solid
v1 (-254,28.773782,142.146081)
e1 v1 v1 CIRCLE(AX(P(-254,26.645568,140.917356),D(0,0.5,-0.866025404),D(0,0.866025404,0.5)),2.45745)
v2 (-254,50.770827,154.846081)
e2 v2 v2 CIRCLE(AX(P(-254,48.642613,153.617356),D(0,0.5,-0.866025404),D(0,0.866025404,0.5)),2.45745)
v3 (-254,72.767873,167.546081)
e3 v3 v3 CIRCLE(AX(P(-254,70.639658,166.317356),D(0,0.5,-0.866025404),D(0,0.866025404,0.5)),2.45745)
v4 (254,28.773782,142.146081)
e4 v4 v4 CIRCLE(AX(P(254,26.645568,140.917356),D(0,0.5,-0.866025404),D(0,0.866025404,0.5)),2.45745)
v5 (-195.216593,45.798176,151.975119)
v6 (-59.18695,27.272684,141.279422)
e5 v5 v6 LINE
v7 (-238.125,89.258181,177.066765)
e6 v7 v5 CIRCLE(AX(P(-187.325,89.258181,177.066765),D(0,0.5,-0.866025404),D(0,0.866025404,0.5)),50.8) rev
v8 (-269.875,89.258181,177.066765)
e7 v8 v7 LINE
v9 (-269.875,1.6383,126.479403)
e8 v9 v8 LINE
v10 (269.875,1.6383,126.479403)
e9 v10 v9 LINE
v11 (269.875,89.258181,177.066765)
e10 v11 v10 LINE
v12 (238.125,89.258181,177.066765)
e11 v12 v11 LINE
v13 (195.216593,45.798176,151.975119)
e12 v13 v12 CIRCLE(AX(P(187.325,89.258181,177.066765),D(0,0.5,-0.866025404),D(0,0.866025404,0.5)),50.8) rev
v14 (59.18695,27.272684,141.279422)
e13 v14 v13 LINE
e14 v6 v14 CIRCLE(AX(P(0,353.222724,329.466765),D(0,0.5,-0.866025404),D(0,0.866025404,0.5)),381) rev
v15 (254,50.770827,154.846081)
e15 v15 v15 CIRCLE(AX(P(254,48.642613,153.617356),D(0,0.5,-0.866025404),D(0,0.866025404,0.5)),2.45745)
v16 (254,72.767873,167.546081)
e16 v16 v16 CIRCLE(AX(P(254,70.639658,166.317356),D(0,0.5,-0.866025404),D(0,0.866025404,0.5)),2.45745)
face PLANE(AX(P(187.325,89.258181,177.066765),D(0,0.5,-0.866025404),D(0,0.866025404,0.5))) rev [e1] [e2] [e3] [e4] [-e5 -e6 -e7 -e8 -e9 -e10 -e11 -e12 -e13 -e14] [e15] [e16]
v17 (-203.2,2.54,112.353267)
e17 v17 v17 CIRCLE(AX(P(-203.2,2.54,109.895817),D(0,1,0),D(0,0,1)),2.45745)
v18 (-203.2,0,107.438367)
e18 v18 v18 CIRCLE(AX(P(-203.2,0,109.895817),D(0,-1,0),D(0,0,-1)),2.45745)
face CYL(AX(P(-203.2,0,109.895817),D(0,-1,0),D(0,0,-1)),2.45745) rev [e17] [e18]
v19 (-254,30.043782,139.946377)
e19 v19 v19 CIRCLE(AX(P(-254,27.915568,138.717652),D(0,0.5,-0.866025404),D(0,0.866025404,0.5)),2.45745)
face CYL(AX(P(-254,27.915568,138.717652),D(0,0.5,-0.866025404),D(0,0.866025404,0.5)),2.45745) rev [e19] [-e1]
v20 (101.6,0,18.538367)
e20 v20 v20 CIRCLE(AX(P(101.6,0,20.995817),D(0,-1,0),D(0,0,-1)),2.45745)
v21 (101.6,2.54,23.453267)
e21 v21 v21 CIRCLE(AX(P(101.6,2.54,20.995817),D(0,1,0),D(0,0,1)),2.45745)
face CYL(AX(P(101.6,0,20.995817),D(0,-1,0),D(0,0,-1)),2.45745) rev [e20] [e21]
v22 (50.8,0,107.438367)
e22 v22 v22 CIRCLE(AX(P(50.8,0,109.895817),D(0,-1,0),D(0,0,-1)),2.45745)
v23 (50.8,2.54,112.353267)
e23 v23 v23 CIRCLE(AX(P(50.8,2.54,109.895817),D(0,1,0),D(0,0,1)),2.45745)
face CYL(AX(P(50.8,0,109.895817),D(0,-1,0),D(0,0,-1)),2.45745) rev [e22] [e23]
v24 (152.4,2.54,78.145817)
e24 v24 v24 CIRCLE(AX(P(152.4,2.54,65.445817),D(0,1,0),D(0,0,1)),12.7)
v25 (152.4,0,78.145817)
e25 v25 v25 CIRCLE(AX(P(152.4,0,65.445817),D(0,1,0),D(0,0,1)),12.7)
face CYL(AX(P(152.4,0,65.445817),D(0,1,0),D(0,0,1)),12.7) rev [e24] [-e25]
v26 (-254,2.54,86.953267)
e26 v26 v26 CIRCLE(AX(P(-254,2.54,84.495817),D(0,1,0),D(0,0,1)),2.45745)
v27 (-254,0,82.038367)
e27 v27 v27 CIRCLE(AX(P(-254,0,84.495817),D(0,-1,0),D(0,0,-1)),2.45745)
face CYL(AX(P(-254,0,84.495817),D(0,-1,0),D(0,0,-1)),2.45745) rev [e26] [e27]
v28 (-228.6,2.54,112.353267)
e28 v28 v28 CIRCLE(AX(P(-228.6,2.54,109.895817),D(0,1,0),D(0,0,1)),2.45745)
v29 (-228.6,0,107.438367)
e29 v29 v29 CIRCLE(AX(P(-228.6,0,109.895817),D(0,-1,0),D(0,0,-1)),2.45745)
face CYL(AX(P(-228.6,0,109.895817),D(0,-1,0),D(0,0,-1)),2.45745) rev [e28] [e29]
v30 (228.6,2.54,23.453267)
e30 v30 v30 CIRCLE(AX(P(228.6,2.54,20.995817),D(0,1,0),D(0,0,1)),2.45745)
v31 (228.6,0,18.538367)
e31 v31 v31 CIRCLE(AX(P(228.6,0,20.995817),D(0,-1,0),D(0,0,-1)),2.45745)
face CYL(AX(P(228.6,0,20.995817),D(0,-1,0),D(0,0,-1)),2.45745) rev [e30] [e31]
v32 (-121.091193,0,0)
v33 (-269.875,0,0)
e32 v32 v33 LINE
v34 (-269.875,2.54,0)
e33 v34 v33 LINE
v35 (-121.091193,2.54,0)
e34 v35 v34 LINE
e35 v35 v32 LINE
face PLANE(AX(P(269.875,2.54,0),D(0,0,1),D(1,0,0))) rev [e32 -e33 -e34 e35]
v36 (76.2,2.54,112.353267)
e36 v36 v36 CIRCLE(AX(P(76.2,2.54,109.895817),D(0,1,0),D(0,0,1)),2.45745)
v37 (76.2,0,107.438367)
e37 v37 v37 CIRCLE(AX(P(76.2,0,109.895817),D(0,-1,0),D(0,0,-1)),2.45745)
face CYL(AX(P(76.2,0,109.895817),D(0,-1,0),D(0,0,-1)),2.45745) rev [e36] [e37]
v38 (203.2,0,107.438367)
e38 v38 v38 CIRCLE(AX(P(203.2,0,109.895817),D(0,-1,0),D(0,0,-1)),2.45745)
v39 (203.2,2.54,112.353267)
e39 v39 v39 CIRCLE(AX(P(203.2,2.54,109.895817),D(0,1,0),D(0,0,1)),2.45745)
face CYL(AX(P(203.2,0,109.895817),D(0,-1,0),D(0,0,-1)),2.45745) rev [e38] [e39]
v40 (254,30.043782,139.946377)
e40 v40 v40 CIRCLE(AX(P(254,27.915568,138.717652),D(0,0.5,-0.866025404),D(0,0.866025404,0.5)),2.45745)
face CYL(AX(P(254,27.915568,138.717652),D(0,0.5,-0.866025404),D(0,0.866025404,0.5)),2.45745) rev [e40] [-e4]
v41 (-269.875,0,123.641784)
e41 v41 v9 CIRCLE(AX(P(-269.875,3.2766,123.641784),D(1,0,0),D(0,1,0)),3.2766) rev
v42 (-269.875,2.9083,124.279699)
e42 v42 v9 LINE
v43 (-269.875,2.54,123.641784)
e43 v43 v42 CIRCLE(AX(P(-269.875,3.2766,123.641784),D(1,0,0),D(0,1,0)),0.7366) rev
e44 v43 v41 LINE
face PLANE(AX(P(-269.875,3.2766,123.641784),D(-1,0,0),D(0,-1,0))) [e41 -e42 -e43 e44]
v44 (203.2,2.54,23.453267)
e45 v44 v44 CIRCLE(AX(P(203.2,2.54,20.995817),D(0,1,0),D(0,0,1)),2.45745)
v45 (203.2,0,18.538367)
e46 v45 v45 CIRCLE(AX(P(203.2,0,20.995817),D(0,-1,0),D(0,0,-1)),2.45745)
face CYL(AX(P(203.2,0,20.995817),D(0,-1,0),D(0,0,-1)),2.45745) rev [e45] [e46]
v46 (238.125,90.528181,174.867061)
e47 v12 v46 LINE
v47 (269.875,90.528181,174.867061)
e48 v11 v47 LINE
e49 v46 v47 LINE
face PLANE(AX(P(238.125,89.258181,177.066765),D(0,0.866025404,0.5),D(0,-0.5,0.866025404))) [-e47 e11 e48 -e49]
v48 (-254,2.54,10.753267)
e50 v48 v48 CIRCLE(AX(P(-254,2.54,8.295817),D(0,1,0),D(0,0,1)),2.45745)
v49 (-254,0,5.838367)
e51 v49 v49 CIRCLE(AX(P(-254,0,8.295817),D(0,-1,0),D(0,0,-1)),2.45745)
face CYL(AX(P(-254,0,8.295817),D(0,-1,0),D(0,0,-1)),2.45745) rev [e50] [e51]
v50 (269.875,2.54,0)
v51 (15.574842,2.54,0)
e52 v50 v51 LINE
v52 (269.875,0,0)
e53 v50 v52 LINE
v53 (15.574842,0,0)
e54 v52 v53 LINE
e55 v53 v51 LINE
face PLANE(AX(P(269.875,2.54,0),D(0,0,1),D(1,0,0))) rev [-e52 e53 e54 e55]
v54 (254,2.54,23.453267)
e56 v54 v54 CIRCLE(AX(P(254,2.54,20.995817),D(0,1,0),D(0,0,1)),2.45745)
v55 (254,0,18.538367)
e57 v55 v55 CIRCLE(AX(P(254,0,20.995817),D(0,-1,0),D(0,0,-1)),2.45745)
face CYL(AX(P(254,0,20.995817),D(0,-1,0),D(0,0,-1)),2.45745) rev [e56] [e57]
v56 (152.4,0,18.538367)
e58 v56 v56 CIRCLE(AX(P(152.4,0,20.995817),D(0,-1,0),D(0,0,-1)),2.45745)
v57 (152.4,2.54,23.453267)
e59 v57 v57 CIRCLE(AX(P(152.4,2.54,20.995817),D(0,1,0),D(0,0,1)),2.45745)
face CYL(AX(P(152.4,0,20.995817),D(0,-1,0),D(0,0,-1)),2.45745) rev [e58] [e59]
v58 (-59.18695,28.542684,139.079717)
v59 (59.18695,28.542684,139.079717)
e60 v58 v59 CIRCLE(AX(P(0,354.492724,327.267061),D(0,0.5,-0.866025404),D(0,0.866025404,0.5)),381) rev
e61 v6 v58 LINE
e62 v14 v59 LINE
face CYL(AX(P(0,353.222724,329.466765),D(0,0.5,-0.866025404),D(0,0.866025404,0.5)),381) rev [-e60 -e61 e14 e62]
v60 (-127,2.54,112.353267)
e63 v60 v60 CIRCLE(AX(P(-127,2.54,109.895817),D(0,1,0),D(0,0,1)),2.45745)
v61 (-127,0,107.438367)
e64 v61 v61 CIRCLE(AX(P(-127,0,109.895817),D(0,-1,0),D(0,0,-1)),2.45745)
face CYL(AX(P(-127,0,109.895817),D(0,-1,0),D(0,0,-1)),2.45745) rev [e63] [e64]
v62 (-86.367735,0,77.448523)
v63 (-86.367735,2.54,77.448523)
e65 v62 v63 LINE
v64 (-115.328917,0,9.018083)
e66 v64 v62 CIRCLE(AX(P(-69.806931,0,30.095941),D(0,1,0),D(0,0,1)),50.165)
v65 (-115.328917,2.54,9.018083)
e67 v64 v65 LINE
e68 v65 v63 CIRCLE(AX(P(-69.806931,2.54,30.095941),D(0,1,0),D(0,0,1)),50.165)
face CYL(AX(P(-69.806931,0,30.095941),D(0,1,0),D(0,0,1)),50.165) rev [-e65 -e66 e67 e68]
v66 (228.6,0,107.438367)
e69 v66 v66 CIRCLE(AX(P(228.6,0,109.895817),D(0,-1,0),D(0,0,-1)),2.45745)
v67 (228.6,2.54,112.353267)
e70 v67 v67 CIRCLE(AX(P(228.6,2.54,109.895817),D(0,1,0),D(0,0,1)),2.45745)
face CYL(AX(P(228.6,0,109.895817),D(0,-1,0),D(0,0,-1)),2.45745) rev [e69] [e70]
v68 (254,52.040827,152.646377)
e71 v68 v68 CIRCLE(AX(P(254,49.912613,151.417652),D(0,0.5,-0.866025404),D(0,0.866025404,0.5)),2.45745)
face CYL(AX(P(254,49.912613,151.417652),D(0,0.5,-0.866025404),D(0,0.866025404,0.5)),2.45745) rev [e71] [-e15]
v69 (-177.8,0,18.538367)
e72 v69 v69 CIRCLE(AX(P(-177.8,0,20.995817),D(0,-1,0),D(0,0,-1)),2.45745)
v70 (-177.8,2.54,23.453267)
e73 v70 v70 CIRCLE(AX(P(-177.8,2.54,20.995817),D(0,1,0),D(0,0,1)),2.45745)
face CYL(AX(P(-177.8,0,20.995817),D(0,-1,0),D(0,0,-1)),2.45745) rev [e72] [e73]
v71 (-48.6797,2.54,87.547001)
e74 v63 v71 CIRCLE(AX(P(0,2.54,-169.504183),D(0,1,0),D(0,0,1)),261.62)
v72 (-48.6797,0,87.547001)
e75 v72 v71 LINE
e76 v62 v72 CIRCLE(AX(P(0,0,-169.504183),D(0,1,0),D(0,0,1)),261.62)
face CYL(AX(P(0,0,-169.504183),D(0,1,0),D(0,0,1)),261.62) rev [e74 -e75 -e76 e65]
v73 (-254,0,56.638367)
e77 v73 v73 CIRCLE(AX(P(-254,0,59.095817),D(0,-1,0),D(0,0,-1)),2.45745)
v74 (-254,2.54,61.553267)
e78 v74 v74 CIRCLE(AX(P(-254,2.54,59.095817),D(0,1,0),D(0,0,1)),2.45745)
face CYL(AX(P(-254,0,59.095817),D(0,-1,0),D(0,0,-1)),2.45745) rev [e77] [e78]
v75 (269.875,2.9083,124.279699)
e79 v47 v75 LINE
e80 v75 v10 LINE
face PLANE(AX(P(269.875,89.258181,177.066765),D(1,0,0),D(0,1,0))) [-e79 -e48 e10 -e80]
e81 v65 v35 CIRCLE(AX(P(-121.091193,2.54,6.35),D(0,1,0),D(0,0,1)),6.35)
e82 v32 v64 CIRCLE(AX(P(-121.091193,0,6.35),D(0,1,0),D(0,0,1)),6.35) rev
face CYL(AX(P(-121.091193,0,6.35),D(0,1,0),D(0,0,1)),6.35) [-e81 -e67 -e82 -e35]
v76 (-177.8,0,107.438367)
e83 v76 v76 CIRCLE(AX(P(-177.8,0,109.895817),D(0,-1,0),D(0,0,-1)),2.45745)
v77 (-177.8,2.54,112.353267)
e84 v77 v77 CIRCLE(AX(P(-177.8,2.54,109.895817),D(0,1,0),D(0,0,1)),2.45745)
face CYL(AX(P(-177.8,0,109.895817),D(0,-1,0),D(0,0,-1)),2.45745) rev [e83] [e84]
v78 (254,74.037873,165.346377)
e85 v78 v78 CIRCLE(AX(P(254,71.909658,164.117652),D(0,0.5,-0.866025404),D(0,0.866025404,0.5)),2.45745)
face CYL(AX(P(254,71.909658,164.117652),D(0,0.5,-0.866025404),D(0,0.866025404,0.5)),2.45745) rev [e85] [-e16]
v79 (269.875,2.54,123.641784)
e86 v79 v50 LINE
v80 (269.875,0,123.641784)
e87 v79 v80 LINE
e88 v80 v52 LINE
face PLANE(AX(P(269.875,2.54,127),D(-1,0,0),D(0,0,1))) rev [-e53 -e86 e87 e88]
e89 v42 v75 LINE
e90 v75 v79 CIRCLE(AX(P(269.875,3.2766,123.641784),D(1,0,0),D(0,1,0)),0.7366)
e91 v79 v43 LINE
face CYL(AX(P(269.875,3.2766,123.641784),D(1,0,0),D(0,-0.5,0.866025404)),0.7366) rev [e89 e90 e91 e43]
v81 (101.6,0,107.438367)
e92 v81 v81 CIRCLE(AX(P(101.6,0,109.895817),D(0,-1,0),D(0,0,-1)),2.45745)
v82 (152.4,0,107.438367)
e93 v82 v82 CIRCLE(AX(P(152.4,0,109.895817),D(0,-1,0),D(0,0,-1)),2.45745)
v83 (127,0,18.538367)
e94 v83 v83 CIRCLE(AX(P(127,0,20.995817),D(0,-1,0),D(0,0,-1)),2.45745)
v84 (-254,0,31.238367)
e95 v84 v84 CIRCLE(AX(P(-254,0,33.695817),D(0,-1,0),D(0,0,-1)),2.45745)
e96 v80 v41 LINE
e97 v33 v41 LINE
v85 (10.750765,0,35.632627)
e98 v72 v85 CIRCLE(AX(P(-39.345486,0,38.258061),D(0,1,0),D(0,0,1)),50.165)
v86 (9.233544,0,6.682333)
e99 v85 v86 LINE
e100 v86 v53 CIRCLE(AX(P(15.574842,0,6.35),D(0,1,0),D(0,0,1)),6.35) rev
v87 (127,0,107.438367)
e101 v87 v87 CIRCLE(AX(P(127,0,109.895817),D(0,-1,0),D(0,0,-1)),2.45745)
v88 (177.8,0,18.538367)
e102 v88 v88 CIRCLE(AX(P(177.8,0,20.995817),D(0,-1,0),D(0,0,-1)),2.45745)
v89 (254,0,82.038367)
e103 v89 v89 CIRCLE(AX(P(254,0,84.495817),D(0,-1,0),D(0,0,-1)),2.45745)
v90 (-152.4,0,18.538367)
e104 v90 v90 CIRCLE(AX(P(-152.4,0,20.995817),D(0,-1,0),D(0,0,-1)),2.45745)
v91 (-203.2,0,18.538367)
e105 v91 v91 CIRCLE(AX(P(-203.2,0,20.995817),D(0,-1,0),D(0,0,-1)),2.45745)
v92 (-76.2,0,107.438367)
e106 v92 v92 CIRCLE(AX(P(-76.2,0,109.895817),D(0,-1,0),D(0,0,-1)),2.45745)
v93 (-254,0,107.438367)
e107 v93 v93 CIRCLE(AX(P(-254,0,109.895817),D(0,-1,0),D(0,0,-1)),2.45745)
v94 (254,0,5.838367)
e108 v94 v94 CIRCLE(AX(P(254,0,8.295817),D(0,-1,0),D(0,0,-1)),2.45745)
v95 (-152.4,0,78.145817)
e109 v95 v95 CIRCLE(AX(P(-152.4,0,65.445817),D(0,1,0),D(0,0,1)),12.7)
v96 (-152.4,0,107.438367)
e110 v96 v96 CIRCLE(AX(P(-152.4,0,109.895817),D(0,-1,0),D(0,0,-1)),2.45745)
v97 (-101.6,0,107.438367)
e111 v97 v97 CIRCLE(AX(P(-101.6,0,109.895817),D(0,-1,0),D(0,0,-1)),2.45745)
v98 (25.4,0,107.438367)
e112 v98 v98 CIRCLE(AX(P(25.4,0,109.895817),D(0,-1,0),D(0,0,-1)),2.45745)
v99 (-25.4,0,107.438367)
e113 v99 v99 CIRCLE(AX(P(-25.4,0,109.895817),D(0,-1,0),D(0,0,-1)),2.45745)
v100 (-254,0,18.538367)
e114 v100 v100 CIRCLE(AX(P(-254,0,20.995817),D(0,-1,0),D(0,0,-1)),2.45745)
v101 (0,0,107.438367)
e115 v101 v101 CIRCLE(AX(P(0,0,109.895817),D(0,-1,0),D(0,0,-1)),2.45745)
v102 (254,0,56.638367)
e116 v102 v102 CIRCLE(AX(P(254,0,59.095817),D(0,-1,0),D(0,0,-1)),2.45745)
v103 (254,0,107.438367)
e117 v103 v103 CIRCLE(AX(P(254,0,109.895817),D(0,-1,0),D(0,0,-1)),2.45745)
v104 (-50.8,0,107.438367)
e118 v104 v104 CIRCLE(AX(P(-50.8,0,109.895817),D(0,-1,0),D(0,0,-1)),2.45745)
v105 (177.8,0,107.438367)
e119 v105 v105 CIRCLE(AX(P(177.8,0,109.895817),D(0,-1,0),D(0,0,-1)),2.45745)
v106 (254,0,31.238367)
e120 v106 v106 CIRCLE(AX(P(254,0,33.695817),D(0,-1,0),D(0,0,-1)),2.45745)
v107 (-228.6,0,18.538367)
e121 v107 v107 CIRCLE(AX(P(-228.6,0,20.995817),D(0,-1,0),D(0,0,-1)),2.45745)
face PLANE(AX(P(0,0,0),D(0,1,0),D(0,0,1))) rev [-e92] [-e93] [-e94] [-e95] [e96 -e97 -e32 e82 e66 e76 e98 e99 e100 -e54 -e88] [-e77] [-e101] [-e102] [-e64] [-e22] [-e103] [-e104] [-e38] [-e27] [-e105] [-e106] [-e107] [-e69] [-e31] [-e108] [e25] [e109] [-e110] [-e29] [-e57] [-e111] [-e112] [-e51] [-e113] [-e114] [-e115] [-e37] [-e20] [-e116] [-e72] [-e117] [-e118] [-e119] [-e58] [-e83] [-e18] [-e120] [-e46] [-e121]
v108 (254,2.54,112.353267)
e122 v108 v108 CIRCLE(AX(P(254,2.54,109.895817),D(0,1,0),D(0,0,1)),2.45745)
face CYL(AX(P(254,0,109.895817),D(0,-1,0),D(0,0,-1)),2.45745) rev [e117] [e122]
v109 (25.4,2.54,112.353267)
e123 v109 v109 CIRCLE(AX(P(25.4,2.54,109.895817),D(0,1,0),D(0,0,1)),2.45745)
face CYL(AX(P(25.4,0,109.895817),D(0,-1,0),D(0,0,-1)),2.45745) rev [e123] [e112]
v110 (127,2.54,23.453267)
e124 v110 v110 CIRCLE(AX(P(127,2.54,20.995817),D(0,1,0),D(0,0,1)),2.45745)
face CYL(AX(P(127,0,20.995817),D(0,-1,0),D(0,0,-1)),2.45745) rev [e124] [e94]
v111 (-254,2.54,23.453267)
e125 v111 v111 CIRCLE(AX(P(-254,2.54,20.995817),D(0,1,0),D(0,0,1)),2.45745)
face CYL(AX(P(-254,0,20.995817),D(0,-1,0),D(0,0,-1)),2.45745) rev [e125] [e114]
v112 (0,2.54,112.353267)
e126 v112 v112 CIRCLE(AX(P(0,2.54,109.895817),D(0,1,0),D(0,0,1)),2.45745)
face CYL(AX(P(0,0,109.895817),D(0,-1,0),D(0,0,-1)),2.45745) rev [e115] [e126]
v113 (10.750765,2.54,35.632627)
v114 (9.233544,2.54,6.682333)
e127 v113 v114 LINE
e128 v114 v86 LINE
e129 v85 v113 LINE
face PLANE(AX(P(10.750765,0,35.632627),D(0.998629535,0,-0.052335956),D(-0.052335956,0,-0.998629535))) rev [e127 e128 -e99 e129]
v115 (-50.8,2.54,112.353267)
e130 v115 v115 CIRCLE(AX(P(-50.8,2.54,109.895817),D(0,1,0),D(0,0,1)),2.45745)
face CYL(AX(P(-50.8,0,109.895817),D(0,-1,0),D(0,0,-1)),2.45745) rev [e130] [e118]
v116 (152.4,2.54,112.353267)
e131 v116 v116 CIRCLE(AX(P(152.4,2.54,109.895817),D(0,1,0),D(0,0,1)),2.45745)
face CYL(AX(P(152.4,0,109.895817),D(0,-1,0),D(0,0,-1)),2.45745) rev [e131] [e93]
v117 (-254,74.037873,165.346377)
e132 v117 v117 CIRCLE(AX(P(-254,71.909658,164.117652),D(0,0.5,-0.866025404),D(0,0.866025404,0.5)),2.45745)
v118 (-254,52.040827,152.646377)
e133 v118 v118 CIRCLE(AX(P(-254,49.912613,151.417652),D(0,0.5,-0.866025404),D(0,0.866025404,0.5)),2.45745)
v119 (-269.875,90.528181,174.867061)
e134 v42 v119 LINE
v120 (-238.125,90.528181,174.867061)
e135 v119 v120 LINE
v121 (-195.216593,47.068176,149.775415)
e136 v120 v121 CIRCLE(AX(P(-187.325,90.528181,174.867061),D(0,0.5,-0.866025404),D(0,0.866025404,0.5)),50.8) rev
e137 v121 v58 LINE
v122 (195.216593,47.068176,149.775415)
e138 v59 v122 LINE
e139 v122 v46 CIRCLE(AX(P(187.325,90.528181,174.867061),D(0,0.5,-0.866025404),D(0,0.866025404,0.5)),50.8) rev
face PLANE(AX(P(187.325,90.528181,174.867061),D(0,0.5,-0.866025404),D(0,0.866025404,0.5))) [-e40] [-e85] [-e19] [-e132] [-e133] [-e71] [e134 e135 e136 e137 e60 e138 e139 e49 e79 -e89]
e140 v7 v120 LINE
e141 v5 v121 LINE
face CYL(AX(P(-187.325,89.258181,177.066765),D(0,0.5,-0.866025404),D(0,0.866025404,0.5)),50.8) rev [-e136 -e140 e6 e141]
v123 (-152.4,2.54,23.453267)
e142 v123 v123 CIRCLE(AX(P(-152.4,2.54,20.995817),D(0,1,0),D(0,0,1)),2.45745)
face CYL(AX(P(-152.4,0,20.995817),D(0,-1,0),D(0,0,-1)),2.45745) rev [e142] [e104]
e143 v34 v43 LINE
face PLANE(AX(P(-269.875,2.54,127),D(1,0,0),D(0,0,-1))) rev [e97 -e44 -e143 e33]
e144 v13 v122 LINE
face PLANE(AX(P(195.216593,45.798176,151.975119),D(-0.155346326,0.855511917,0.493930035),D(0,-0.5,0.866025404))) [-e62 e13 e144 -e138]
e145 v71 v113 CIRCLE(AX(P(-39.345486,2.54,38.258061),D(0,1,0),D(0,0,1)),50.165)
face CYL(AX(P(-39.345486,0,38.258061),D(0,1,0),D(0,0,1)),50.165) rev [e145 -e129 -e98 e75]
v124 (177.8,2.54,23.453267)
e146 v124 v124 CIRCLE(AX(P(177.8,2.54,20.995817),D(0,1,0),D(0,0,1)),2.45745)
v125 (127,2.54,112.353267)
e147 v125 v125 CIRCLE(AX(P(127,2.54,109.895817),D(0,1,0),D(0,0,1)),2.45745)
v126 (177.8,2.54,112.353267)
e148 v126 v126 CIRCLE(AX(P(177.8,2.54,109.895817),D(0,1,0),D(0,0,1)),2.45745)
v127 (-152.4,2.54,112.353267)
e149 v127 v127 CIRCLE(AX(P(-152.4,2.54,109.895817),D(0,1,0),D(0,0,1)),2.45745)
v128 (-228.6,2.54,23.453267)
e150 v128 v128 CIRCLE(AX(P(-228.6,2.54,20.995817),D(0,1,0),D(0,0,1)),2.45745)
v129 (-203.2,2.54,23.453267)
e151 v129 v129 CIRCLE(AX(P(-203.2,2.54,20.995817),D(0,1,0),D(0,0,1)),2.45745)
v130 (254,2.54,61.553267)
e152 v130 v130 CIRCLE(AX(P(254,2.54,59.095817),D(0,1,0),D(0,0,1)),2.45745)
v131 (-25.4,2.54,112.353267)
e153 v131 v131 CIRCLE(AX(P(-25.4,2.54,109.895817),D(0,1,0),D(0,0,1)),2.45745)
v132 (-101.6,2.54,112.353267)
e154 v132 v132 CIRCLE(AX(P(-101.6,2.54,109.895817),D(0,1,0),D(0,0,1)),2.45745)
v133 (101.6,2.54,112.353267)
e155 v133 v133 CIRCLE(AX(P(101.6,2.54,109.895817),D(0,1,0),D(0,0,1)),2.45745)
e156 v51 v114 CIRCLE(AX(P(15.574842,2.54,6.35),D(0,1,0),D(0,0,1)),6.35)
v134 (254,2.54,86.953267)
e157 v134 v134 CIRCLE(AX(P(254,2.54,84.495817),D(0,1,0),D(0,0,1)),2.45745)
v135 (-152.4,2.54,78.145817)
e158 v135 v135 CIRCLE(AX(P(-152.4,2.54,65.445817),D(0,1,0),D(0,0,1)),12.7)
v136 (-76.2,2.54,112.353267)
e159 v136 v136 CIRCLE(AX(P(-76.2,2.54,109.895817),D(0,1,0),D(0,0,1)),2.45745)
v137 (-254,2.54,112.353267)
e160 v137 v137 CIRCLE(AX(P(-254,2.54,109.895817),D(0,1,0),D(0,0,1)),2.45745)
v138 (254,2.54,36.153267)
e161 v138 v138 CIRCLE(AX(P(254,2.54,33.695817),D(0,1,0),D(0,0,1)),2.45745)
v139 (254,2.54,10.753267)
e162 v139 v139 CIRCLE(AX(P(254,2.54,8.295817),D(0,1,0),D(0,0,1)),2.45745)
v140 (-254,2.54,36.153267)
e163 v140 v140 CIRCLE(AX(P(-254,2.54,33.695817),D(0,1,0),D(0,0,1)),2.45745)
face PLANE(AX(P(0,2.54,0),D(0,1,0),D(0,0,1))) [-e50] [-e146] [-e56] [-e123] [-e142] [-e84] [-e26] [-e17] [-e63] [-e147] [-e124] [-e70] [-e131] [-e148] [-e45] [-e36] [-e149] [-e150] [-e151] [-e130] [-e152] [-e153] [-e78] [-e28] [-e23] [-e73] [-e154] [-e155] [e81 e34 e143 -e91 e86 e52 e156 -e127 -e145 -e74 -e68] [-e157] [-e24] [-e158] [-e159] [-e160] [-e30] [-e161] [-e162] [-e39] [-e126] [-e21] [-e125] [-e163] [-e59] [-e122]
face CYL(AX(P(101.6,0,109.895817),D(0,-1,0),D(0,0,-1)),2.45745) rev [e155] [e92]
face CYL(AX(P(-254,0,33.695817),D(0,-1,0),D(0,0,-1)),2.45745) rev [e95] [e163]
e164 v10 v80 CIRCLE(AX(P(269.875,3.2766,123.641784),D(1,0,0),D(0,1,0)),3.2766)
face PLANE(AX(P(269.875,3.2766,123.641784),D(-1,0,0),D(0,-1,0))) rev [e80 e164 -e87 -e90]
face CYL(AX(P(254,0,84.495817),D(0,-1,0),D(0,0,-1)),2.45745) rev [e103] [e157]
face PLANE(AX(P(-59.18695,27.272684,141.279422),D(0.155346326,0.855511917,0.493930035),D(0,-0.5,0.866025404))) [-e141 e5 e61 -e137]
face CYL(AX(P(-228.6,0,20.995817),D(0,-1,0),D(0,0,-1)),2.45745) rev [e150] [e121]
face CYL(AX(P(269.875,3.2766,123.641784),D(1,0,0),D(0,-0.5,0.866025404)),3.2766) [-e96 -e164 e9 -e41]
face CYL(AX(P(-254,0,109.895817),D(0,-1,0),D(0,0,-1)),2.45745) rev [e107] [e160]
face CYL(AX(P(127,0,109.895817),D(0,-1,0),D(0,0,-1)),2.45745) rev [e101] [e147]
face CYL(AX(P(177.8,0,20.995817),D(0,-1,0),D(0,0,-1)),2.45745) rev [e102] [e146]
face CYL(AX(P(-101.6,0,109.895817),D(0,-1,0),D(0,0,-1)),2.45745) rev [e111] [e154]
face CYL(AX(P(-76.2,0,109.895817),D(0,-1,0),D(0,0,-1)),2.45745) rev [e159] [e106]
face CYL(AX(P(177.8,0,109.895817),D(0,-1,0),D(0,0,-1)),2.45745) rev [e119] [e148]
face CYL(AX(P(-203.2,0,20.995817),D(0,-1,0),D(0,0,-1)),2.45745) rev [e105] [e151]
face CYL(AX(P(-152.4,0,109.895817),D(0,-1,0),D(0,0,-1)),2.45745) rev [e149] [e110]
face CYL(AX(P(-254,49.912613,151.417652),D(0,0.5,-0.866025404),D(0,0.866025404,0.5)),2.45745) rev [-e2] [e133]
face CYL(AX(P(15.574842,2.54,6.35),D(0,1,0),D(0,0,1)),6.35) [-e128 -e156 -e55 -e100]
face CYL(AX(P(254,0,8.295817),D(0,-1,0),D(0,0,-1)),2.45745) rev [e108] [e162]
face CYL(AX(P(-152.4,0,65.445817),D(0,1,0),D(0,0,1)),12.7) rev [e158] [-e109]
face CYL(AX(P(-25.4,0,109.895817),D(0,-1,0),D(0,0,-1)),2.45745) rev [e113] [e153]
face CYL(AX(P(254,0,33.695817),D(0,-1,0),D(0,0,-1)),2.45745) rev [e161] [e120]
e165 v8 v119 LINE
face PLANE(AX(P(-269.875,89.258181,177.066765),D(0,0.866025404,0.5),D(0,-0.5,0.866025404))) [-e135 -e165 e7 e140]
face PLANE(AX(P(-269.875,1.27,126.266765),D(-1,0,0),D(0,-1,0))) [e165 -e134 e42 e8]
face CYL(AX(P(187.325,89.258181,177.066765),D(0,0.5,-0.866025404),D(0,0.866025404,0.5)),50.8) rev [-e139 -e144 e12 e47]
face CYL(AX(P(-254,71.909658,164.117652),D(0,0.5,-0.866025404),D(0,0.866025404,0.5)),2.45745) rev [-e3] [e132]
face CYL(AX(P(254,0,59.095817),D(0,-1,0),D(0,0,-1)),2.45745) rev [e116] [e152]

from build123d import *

# Parameters (mm, degrees)
SKETCH1_W             = 539.75
SKETCH1_H             = 127
BASE_FLANGE1_DEPTH    = 2.54
EDGE_FLANGE1_START    = -269.875
EDGE_FLANGE1_DEPTH    = 539.75
EDGE_FLANGE1_2_DEPTH  = 539.75
EDGE_FLANGE1_START_2  = -108.715226281
EDGE_FLANGE1_3_DEPTH  = 2.54
F_8_CLEARANCE_HOLE1_D = 4.9149
CUT_EXTRUDE1_DEPTH    = 335.555040238
DELETEFACE1_START     = -76.607285952
DELETEFACE1_OUTLINE_W = 2.54
DELETEFACE1_OUTLINE_H = 31
DELETEFACE1_DEPTH     = 85.478449448
FILLET1_R             = 6.35
F_8_CLEARANCE_HOLE2_D = 4.9149
SKETCH19_R            = 12.7
CUT_EXTRUDE2_DEPTH    = 335.555040319


with BuildPart() as part:
    # Base-Flange1: sheet metal written as solids
    # Sketch1 → Base-Flange1 (new body)
    with BuildSketch(Plane(origin=(0, 0, 0), x_dir=(1, 0, 0), z_dir=(0, 1, 0))):
        with Locations((0, -63.5)):
            Rectangle(SKETCH1_W, SKETCH1_H)
    extrude(amount=BASE_FLANGE1_DEPTH)

    # Edge-Flange1: read off the stored shape, not the designer's step
    # Edge-Flange1 outline → Edge-Flange1 (cut)
    with BuildSketch(Plane.YZ.offset(EDGE_FLANGE1_START)):
        with BuildLine():
            ThreePointArc((0, 123.641784424), (0.438981162, 125.280084424), (1.6383, 126.479403262))
            Line((1.6383, 126.479403262), (2.54, 127))
            Line((2.54, 127), (0, 127))
            Line((0, 127), (0, 123.641784424))
        make_face()
    extrude(amount=EDGE_FLANGE1_DEPTH, mode=Mode.SUBTRACT)

    # Edge-Flange1 2 outline → Edge-Flange1 2 (add)
    with BuildSketch(Plane.YZ.offset(EDGE_FLANGE1_START)):
        with BuildLine():
            Line((89.258181024, 177.066765158), (2.54, 127))
            Line((2.54, 127), (2.54, 123.641784424))
            ThreePointArc((2.54, 123.641784424), (2.638685688, 124.010084424), (2.9083, 124.279698737))
            Line((2.9083, 124.279698737), (90.528181024, 174.867060633))
            Line((90.528181024, 174.867060633), (89.258181024, 177.066765158))
        make_face()
    extrude(amount=EDGE_FLANGE1_2_DEPTH)

    # Edge-Flange1 3 outline → Edge-Flange1 3 (cut)
    with BuildSketch(Plane(origin=(0, 0, 0), x_dir=(1, 0, 0), z_dir=(0, 0.50000000000001, -0.8660254037844329)).offset(EDGE_FLANGE1_START_2)):
        with BuildLine():
            Line((-238.125, -165.833234842), (238.125, -165.833234842))
            ThreePointArc((238.125, -165.833234842), (225.935445104, -132.820002209), (195.216593352, -115.649943256))
            Line((195.216593352, -115.649943256), (59.186950142, -94.25854795))
            ThreePointArc((59.186950142, -94.25854795), (0, -89.633234842), (-59.186950142, -94.25854795))
            Line((-59.186950142, -94.25854795), (-195.216593352, -115.649943256))
            ThreePointArc((-195.216593352, -115.649943256), (-225.935445104, -132.820002209), (-238.125, -165.833234842))
        make_face()
    extrude(amount=EDGE_FLANGE1_3_DEPTH, mode=Mode.SUBTRACT)

    # #8 Clearance Hole1 (through all)
    with Locations(Plane(origin=(0, 0, 0), x_dir=(-1, 0, 0), z_dir=(0, -1, 0))):
        with Locations((-101.6, -20.995817153), (-127, -20.995817153), (-152.4, -20.995817153), (-177.8, -20.995817153), (-203.2, -20.995817153), (-228.6, -20.995817153), (152.4, -20.995817153), (177.8, -20.995817153), (203.2, -20.995817153), (228.6, -20.995817153), (-228.6, -109.895817153), (-203.2, -109.895817153), (-177.8, -109.895817153), (-152.4, -109.895817153), (-127, -109.895817153), (-101.6, -109.895817153), (-76.2, -109.895817153), (-50.8, -109.895817153), (-25.4, -109.895817153), (50.8, -109.895817153), (76.2, -109.895817153), (101.6, -109.895817153), (127, -109.895817153), (25.4, -109.895817153), (0, -109.895817153), (152.4, -109.895817153), (177.8, -109.895817153), (203.2, -109.895817153), (228.6, -109.895817153), (-254, -109.895817153), (-254, -59.095817153), (-254, -33.695817153), (-254, -8.295817153), (-254, -84.495817153), (254, -109.895817153), (254, -84.495817153), (254, -59.095817153), (254, -33.695817153), (254, -8.295817153), (254, -20.995817153), (-254, -20.995817153)):
            Hole(F_8_CLEARANCE_HOLE1_D / 2)

    # Sketch12 → Cut-Extrude1 (cut, through all)
    with BuildSketch(Plane(origin=(0, 2.54, 0), x_dir=(1, 0, 0), z_dir=(0, 1, 0))):
        with BuildLine():
            Line((10.750764667, -35.632627255), (10.064214119, -22.532462404))
            ThreePointArc((10.064214119, -22.532462404), (8.049198612, -18.216593523), (3.600048039, -16.515984552))
            ThreePointArc((3.600048039, -16.515984552), (-48.154577437, -10.211146763), (-96.127816756, 10.206016283))
            ThreePointArc((-96.127816756, 10.206016283), (-100.831198663, 10.957820999), (-104.734187721, 8.227676662))
            Line((-104.734187721, 8.227676662), (-111.878840363, -2.77412362))
            ThreePointArc((-111.878840363, -2.77412362), (-117.278135386, -46.313585823), (-86.367734849, -77.4485227))
            ThreePointArc((-86.367734849, -77.4485227), (-67.71223858, -83.201331827), (-48.679700327, -87.547001114))
            ThreePointArc((-48.679700327, -87.547001114), (-6.343039783, -76.038555102), (10.750764667, -35.632627255))
        make_face()
    extrude(amount=-CUT_EXTRUDE1_DEPTH, mode=Mode.SUBTRACT)

    # DeleteFace1: read off the stored shape, not the designer's step
    # DeleteFace1 outline → DeleteFace1 (cut)
    with BuildSketch(Plane(origin=(0, 0, 0), x_dir=(0, 1, 0), z_dir=(0.9986295347545738, 0, -0.052335956242945486)).offset(DELETEFACE1_START)):
        with Locations((1.27, 9.5)):
            Rectangle(DELETEFACE1_OUTLINE_W, DELETEFACE1_OUTLINE_H)
    extrude(amount=DELETEFACE1_DEPTH, mode=Mode.SUBTRACT)

    # Fillet1
    fillet1_edges = [part.edges().sort_by_distance(p)[0] for p in [
        (8.883337802, 1.27, 0),
        (-110.07730342, 1.27, 0),
    ]]
    fillet(fillet1_edges, radius=FILLET1_R)

    # #8 Clearance Hole2 (through all)
    with Locations(Plane(origin=(0, -53.08761314, 91.950443212), x_dir=(-1, 0, 0), z_dir=(0, 0.5000000000000102, -0.8660254037844328))):
        with Locations((-254, 144.334416739), (-254, 118.934416739), (-254, 93.534416739), (254, 93.534416739), (254, 118.934416739), (254, 144.334416739)):
            Hole(F_8_CLEARANCE_HOLE2_D / 2)

    # Sketch19 → Cut-Extrude2 (cut, through all)
    with BuildSketch(Plane(origin=(0, 2.54, 0), x_dir=(1, 0, 0), z_dir=(0, 1, 0))):
        with Locations(Location((152.4, -65.445817153, 0), (0, 0, 270))):
            Circle(SKETCH19_R)
        with Locations(Location((-152.4, -65.445817153, 0), (0, 0, 270))):
            Circle(SKETCH19_R)
    extrude(amount=-CUT_EXTRUDE2_DEPTH, mode=Mode.SUBTRACT)


solid = part.part
